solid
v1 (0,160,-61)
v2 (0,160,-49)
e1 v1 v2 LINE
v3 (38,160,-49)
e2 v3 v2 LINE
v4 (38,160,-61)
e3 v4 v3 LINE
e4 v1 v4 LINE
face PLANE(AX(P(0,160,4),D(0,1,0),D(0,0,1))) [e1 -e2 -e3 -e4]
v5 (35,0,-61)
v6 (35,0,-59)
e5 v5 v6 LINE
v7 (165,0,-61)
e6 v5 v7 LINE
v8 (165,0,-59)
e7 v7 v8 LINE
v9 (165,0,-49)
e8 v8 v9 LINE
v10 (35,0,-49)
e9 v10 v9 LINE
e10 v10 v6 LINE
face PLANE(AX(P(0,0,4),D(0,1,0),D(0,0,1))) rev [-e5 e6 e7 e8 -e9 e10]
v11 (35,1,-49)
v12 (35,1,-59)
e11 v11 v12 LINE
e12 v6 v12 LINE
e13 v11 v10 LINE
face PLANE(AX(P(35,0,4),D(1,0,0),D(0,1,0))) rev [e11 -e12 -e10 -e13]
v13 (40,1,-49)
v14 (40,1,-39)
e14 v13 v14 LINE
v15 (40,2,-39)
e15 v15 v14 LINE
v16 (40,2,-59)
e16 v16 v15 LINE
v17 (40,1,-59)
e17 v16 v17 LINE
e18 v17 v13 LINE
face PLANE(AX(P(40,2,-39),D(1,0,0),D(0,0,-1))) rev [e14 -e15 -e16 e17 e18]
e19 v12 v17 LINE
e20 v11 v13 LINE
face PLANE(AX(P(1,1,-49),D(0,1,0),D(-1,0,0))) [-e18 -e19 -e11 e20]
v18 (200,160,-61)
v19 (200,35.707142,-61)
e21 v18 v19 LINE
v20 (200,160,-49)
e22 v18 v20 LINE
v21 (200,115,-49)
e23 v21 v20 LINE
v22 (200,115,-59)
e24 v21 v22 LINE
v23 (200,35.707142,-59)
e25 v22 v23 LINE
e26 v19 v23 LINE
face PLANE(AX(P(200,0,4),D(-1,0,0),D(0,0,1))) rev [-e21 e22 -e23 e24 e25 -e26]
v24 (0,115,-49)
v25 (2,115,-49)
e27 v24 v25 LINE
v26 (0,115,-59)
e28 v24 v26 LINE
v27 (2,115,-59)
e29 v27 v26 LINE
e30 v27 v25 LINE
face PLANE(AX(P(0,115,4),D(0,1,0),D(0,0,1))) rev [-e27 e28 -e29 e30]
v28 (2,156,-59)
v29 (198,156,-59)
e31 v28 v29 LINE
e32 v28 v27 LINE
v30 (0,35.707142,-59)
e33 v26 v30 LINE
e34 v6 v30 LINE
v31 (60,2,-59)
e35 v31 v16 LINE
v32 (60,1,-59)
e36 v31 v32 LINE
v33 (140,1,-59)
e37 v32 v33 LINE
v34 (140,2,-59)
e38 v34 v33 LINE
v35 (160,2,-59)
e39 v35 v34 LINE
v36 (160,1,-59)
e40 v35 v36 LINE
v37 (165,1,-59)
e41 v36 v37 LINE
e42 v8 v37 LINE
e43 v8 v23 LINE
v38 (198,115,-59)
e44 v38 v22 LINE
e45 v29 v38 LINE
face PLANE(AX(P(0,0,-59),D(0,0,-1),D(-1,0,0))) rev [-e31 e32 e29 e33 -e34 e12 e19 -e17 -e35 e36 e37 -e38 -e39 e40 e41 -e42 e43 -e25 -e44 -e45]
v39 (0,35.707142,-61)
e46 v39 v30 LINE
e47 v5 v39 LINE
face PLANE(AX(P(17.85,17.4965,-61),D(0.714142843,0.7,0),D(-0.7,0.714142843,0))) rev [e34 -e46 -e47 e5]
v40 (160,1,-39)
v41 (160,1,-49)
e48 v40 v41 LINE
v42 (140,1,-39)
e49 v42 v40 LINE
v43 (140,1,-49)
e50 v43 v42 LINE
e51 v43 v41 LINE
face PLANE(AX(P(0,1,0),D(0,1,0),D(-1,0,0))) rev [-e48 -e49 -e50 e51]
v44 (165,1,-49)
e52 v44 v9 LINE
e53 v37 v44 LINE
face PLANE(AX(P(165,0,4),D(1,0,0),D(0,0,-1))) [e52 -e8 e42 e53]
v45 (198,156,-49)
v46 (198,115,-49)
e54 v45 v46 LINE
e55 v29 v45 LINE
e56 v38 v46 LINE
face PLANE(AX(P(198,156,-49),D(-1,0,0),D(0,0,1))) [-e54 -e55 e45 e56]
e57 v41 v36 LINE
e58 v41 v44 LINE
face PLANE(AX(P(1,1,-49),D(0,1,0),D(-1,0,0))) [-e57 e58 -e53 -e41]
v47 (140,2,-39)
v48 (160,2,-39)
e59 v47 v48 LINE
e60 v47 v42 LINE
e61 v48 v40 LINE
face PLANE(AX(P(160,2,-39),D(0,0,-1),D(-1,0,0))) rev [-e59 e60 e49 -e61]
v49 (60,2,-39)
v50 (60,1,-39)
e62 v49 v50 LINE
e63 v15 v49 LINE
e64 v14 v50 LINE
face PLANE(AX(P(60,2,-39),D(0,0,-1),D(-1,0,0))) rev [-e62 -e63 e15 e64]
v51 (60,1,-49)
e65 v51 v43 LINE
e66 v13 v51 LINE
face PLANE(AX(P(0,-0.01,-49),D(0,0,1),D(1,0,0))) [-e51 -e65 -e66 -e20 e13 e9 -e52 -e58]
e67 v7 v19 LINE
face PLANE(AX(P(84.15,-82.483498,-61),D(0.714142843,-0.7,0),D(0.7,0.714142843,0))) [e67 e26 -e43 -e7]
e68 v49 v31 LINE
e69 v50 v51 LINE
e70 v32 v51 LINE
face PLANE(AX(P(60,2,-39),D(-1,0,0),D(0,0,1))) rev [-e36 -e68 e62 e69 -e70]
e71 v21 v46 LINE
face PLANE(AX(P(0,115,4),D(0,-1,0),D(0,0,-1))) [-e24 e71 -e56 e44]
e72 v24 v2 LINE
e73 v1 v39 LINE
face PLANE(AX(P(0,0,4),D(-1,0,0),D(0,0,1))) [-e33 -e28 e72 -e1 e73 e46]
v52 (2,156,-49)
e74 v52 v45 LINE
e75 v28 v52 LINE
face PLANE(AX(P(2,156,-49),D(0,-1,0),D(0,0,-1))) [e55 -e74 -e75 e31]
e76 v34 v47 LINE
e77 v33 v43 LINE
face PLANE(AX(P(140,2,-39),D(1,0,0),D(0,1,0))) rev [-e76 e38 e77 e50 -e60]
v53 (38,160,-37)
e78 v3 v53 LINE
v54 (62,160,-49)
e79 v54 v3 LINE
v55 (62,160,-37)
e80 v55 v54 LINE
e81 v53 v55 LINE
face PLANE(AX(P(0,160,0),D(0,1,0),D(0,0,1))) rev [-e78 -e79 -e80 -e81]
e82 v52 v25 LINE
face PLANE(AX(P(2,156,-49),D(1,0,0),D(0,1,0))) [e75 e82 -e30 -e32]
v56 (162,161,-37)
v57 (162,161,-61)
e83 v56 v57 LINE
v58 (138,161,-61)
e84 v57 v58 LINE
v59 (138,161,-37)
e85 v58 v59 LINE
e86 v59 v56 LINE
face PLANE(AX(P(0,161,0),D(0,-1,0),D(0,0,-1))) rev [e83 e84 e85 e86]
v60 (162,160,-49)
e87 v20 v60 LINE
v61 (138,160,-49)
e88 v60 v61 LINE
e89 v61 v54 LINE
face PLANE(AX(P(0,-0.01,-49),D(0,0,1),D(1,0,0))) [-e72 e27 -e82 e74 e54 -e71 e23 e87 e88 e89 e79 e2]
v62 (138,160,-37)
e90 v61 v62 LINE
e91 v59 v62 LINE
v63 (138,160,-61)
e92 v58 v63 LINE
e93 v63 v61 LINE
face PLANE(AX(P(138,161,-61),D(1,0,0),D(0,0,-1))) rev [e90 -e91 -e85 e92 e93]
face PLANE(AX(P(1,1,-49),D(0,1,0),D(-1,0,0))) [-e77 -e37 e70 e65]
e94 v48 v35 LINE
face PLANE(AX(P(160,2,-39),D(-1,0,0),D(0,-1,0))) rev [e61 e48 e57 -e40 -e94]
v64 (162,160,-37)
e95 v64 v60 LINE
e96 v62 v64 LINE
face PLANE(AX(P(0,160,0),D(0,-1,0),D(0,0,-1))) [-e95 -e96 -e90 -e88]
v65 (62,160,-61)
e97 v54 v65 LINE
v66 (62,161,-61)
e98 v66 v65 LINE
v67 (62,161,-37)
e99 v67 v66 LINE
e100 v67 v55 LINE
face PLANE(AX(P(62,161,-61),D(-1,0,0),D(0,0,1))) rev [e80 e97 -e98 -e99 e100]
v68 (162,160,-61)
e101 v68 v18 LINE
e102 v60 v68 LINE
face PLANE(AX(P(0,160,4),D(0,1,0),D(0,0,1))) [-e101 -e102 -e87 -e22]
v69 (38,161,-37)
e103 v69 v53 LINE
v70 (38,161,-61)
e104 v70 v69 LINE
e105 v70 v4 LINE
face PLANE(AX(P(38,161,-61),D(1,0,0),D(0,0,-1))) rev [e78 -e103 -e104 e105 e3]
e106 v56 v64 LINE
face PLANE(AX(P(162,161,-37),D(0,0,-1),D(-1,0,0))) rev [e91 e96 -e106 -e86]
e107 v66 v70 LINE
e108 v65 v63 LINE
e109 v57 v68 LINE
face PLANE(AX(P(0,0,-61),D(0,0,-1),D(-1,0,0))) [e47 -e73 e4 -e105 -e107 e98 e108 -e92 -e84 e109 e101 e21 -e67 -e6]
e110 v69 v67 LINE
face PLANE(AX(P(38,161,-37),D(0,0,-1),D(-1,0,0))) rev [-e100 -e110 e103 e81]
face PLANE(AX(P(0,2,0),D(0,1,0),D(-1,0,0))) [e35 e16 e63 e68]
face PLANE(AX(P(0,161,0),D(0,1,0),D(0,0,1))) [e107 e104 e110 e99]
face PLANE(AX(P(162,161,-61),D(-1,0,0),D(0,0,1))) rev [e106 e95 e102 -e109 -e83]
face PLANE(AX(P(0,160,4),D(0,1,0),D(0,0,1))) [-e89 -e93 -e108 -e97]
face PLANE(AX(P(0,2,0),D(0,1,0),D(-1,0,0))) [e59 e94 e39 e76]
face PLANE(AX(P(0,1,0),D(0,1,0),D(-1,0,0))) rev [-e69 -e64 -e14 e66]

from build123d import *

# Parameters (mm, degrees)
STOCK_PART1_1_START       = -61
STOCK_PART1_1_DEPTH       = 2
STOCK_PART1_1_START_2     = -59
STOCK_PART1_1_2_OUTLINE_W = 130
STOCK_PART1_1_2_OUTLINE_H = 1
STOCK_PART1_1_2_DEPTH     = 10
SKETCH1_W                 = 24
SKETCH1_H                 = 24
BOSS_EXTRUDE1_DEPTH       = 1
SKETCH2_W                 = 20
SKETCH2_H                 = 20
BOSS_EXTRUDE2_DEPTH       = 1


# Read off the part's stored shape, not the designer's step: Stock-Part1-1
with BuildPart() as part:
    # Stock-Part1-1 outline → Stock-Part1-1 (new body)
    with BuildSketch(Plane.XY.offset(STOCK_PART1_1_START)):
        Polygon((0, 35.707142143), (35, 0), (165, 0), (200, 35.707142143), (200, 160), (0, 160), align=None)
    extrude(amount=STOCK_PART1_1_DEPTH)

    # Stock-Part1-1 2 outline → Stock-Part1-1 2 (add)
    with BuildSketch(Plane.XY.offset(STOCK_PART1_1_START_2)):
        with Locations((100, 0.5)):
            Rectangle(STOCK_PART1_1_2_OUTLINE_W, STOCK_PART1_1_2_OUTLINE_H)
        Polygon((198, 115), (200, 115), (200, 160), (0, 160), (0, 115), (2, 115), (2, 156), (198, 156), align=None)
    extrude(amount=STOCK_PART1_1_2_DEPTH)

    # Sketch1 → Boss-Extrude1 (add)
    with BuildSketch(Plane(origin=(0, 160, 0), x_dir=(1, 0, 0), z_dir=(0, 1, 0))):
        with Locations((150, 49)):
            Rectangle(SKETCH1_W, SKETCH1_H)
        with Locations((50, 49)):
            Rectangle(SKETCH1_W, SKETCH1_H)
    extrude(amount=BOSS_EXTRUDE1_DEPTH)

    # Sketch2 → Boss-Extrude2 (add)
    with BuildSketch(Plane(origin=(0, 1, 0), x_dir=(1, 0, 0), z_dir=(0, 1, 0))):
        with Locations((50, 49)):
            Rectangle(SKETCH2_W, SKETCH2_H)
        with Locations((150, 49)):
            Rectangle(SKETCH2_W, SKETCH2_H)
    extrude(amount=BOSS_EXTRUDE2_DEPTH)


solid = part.part
